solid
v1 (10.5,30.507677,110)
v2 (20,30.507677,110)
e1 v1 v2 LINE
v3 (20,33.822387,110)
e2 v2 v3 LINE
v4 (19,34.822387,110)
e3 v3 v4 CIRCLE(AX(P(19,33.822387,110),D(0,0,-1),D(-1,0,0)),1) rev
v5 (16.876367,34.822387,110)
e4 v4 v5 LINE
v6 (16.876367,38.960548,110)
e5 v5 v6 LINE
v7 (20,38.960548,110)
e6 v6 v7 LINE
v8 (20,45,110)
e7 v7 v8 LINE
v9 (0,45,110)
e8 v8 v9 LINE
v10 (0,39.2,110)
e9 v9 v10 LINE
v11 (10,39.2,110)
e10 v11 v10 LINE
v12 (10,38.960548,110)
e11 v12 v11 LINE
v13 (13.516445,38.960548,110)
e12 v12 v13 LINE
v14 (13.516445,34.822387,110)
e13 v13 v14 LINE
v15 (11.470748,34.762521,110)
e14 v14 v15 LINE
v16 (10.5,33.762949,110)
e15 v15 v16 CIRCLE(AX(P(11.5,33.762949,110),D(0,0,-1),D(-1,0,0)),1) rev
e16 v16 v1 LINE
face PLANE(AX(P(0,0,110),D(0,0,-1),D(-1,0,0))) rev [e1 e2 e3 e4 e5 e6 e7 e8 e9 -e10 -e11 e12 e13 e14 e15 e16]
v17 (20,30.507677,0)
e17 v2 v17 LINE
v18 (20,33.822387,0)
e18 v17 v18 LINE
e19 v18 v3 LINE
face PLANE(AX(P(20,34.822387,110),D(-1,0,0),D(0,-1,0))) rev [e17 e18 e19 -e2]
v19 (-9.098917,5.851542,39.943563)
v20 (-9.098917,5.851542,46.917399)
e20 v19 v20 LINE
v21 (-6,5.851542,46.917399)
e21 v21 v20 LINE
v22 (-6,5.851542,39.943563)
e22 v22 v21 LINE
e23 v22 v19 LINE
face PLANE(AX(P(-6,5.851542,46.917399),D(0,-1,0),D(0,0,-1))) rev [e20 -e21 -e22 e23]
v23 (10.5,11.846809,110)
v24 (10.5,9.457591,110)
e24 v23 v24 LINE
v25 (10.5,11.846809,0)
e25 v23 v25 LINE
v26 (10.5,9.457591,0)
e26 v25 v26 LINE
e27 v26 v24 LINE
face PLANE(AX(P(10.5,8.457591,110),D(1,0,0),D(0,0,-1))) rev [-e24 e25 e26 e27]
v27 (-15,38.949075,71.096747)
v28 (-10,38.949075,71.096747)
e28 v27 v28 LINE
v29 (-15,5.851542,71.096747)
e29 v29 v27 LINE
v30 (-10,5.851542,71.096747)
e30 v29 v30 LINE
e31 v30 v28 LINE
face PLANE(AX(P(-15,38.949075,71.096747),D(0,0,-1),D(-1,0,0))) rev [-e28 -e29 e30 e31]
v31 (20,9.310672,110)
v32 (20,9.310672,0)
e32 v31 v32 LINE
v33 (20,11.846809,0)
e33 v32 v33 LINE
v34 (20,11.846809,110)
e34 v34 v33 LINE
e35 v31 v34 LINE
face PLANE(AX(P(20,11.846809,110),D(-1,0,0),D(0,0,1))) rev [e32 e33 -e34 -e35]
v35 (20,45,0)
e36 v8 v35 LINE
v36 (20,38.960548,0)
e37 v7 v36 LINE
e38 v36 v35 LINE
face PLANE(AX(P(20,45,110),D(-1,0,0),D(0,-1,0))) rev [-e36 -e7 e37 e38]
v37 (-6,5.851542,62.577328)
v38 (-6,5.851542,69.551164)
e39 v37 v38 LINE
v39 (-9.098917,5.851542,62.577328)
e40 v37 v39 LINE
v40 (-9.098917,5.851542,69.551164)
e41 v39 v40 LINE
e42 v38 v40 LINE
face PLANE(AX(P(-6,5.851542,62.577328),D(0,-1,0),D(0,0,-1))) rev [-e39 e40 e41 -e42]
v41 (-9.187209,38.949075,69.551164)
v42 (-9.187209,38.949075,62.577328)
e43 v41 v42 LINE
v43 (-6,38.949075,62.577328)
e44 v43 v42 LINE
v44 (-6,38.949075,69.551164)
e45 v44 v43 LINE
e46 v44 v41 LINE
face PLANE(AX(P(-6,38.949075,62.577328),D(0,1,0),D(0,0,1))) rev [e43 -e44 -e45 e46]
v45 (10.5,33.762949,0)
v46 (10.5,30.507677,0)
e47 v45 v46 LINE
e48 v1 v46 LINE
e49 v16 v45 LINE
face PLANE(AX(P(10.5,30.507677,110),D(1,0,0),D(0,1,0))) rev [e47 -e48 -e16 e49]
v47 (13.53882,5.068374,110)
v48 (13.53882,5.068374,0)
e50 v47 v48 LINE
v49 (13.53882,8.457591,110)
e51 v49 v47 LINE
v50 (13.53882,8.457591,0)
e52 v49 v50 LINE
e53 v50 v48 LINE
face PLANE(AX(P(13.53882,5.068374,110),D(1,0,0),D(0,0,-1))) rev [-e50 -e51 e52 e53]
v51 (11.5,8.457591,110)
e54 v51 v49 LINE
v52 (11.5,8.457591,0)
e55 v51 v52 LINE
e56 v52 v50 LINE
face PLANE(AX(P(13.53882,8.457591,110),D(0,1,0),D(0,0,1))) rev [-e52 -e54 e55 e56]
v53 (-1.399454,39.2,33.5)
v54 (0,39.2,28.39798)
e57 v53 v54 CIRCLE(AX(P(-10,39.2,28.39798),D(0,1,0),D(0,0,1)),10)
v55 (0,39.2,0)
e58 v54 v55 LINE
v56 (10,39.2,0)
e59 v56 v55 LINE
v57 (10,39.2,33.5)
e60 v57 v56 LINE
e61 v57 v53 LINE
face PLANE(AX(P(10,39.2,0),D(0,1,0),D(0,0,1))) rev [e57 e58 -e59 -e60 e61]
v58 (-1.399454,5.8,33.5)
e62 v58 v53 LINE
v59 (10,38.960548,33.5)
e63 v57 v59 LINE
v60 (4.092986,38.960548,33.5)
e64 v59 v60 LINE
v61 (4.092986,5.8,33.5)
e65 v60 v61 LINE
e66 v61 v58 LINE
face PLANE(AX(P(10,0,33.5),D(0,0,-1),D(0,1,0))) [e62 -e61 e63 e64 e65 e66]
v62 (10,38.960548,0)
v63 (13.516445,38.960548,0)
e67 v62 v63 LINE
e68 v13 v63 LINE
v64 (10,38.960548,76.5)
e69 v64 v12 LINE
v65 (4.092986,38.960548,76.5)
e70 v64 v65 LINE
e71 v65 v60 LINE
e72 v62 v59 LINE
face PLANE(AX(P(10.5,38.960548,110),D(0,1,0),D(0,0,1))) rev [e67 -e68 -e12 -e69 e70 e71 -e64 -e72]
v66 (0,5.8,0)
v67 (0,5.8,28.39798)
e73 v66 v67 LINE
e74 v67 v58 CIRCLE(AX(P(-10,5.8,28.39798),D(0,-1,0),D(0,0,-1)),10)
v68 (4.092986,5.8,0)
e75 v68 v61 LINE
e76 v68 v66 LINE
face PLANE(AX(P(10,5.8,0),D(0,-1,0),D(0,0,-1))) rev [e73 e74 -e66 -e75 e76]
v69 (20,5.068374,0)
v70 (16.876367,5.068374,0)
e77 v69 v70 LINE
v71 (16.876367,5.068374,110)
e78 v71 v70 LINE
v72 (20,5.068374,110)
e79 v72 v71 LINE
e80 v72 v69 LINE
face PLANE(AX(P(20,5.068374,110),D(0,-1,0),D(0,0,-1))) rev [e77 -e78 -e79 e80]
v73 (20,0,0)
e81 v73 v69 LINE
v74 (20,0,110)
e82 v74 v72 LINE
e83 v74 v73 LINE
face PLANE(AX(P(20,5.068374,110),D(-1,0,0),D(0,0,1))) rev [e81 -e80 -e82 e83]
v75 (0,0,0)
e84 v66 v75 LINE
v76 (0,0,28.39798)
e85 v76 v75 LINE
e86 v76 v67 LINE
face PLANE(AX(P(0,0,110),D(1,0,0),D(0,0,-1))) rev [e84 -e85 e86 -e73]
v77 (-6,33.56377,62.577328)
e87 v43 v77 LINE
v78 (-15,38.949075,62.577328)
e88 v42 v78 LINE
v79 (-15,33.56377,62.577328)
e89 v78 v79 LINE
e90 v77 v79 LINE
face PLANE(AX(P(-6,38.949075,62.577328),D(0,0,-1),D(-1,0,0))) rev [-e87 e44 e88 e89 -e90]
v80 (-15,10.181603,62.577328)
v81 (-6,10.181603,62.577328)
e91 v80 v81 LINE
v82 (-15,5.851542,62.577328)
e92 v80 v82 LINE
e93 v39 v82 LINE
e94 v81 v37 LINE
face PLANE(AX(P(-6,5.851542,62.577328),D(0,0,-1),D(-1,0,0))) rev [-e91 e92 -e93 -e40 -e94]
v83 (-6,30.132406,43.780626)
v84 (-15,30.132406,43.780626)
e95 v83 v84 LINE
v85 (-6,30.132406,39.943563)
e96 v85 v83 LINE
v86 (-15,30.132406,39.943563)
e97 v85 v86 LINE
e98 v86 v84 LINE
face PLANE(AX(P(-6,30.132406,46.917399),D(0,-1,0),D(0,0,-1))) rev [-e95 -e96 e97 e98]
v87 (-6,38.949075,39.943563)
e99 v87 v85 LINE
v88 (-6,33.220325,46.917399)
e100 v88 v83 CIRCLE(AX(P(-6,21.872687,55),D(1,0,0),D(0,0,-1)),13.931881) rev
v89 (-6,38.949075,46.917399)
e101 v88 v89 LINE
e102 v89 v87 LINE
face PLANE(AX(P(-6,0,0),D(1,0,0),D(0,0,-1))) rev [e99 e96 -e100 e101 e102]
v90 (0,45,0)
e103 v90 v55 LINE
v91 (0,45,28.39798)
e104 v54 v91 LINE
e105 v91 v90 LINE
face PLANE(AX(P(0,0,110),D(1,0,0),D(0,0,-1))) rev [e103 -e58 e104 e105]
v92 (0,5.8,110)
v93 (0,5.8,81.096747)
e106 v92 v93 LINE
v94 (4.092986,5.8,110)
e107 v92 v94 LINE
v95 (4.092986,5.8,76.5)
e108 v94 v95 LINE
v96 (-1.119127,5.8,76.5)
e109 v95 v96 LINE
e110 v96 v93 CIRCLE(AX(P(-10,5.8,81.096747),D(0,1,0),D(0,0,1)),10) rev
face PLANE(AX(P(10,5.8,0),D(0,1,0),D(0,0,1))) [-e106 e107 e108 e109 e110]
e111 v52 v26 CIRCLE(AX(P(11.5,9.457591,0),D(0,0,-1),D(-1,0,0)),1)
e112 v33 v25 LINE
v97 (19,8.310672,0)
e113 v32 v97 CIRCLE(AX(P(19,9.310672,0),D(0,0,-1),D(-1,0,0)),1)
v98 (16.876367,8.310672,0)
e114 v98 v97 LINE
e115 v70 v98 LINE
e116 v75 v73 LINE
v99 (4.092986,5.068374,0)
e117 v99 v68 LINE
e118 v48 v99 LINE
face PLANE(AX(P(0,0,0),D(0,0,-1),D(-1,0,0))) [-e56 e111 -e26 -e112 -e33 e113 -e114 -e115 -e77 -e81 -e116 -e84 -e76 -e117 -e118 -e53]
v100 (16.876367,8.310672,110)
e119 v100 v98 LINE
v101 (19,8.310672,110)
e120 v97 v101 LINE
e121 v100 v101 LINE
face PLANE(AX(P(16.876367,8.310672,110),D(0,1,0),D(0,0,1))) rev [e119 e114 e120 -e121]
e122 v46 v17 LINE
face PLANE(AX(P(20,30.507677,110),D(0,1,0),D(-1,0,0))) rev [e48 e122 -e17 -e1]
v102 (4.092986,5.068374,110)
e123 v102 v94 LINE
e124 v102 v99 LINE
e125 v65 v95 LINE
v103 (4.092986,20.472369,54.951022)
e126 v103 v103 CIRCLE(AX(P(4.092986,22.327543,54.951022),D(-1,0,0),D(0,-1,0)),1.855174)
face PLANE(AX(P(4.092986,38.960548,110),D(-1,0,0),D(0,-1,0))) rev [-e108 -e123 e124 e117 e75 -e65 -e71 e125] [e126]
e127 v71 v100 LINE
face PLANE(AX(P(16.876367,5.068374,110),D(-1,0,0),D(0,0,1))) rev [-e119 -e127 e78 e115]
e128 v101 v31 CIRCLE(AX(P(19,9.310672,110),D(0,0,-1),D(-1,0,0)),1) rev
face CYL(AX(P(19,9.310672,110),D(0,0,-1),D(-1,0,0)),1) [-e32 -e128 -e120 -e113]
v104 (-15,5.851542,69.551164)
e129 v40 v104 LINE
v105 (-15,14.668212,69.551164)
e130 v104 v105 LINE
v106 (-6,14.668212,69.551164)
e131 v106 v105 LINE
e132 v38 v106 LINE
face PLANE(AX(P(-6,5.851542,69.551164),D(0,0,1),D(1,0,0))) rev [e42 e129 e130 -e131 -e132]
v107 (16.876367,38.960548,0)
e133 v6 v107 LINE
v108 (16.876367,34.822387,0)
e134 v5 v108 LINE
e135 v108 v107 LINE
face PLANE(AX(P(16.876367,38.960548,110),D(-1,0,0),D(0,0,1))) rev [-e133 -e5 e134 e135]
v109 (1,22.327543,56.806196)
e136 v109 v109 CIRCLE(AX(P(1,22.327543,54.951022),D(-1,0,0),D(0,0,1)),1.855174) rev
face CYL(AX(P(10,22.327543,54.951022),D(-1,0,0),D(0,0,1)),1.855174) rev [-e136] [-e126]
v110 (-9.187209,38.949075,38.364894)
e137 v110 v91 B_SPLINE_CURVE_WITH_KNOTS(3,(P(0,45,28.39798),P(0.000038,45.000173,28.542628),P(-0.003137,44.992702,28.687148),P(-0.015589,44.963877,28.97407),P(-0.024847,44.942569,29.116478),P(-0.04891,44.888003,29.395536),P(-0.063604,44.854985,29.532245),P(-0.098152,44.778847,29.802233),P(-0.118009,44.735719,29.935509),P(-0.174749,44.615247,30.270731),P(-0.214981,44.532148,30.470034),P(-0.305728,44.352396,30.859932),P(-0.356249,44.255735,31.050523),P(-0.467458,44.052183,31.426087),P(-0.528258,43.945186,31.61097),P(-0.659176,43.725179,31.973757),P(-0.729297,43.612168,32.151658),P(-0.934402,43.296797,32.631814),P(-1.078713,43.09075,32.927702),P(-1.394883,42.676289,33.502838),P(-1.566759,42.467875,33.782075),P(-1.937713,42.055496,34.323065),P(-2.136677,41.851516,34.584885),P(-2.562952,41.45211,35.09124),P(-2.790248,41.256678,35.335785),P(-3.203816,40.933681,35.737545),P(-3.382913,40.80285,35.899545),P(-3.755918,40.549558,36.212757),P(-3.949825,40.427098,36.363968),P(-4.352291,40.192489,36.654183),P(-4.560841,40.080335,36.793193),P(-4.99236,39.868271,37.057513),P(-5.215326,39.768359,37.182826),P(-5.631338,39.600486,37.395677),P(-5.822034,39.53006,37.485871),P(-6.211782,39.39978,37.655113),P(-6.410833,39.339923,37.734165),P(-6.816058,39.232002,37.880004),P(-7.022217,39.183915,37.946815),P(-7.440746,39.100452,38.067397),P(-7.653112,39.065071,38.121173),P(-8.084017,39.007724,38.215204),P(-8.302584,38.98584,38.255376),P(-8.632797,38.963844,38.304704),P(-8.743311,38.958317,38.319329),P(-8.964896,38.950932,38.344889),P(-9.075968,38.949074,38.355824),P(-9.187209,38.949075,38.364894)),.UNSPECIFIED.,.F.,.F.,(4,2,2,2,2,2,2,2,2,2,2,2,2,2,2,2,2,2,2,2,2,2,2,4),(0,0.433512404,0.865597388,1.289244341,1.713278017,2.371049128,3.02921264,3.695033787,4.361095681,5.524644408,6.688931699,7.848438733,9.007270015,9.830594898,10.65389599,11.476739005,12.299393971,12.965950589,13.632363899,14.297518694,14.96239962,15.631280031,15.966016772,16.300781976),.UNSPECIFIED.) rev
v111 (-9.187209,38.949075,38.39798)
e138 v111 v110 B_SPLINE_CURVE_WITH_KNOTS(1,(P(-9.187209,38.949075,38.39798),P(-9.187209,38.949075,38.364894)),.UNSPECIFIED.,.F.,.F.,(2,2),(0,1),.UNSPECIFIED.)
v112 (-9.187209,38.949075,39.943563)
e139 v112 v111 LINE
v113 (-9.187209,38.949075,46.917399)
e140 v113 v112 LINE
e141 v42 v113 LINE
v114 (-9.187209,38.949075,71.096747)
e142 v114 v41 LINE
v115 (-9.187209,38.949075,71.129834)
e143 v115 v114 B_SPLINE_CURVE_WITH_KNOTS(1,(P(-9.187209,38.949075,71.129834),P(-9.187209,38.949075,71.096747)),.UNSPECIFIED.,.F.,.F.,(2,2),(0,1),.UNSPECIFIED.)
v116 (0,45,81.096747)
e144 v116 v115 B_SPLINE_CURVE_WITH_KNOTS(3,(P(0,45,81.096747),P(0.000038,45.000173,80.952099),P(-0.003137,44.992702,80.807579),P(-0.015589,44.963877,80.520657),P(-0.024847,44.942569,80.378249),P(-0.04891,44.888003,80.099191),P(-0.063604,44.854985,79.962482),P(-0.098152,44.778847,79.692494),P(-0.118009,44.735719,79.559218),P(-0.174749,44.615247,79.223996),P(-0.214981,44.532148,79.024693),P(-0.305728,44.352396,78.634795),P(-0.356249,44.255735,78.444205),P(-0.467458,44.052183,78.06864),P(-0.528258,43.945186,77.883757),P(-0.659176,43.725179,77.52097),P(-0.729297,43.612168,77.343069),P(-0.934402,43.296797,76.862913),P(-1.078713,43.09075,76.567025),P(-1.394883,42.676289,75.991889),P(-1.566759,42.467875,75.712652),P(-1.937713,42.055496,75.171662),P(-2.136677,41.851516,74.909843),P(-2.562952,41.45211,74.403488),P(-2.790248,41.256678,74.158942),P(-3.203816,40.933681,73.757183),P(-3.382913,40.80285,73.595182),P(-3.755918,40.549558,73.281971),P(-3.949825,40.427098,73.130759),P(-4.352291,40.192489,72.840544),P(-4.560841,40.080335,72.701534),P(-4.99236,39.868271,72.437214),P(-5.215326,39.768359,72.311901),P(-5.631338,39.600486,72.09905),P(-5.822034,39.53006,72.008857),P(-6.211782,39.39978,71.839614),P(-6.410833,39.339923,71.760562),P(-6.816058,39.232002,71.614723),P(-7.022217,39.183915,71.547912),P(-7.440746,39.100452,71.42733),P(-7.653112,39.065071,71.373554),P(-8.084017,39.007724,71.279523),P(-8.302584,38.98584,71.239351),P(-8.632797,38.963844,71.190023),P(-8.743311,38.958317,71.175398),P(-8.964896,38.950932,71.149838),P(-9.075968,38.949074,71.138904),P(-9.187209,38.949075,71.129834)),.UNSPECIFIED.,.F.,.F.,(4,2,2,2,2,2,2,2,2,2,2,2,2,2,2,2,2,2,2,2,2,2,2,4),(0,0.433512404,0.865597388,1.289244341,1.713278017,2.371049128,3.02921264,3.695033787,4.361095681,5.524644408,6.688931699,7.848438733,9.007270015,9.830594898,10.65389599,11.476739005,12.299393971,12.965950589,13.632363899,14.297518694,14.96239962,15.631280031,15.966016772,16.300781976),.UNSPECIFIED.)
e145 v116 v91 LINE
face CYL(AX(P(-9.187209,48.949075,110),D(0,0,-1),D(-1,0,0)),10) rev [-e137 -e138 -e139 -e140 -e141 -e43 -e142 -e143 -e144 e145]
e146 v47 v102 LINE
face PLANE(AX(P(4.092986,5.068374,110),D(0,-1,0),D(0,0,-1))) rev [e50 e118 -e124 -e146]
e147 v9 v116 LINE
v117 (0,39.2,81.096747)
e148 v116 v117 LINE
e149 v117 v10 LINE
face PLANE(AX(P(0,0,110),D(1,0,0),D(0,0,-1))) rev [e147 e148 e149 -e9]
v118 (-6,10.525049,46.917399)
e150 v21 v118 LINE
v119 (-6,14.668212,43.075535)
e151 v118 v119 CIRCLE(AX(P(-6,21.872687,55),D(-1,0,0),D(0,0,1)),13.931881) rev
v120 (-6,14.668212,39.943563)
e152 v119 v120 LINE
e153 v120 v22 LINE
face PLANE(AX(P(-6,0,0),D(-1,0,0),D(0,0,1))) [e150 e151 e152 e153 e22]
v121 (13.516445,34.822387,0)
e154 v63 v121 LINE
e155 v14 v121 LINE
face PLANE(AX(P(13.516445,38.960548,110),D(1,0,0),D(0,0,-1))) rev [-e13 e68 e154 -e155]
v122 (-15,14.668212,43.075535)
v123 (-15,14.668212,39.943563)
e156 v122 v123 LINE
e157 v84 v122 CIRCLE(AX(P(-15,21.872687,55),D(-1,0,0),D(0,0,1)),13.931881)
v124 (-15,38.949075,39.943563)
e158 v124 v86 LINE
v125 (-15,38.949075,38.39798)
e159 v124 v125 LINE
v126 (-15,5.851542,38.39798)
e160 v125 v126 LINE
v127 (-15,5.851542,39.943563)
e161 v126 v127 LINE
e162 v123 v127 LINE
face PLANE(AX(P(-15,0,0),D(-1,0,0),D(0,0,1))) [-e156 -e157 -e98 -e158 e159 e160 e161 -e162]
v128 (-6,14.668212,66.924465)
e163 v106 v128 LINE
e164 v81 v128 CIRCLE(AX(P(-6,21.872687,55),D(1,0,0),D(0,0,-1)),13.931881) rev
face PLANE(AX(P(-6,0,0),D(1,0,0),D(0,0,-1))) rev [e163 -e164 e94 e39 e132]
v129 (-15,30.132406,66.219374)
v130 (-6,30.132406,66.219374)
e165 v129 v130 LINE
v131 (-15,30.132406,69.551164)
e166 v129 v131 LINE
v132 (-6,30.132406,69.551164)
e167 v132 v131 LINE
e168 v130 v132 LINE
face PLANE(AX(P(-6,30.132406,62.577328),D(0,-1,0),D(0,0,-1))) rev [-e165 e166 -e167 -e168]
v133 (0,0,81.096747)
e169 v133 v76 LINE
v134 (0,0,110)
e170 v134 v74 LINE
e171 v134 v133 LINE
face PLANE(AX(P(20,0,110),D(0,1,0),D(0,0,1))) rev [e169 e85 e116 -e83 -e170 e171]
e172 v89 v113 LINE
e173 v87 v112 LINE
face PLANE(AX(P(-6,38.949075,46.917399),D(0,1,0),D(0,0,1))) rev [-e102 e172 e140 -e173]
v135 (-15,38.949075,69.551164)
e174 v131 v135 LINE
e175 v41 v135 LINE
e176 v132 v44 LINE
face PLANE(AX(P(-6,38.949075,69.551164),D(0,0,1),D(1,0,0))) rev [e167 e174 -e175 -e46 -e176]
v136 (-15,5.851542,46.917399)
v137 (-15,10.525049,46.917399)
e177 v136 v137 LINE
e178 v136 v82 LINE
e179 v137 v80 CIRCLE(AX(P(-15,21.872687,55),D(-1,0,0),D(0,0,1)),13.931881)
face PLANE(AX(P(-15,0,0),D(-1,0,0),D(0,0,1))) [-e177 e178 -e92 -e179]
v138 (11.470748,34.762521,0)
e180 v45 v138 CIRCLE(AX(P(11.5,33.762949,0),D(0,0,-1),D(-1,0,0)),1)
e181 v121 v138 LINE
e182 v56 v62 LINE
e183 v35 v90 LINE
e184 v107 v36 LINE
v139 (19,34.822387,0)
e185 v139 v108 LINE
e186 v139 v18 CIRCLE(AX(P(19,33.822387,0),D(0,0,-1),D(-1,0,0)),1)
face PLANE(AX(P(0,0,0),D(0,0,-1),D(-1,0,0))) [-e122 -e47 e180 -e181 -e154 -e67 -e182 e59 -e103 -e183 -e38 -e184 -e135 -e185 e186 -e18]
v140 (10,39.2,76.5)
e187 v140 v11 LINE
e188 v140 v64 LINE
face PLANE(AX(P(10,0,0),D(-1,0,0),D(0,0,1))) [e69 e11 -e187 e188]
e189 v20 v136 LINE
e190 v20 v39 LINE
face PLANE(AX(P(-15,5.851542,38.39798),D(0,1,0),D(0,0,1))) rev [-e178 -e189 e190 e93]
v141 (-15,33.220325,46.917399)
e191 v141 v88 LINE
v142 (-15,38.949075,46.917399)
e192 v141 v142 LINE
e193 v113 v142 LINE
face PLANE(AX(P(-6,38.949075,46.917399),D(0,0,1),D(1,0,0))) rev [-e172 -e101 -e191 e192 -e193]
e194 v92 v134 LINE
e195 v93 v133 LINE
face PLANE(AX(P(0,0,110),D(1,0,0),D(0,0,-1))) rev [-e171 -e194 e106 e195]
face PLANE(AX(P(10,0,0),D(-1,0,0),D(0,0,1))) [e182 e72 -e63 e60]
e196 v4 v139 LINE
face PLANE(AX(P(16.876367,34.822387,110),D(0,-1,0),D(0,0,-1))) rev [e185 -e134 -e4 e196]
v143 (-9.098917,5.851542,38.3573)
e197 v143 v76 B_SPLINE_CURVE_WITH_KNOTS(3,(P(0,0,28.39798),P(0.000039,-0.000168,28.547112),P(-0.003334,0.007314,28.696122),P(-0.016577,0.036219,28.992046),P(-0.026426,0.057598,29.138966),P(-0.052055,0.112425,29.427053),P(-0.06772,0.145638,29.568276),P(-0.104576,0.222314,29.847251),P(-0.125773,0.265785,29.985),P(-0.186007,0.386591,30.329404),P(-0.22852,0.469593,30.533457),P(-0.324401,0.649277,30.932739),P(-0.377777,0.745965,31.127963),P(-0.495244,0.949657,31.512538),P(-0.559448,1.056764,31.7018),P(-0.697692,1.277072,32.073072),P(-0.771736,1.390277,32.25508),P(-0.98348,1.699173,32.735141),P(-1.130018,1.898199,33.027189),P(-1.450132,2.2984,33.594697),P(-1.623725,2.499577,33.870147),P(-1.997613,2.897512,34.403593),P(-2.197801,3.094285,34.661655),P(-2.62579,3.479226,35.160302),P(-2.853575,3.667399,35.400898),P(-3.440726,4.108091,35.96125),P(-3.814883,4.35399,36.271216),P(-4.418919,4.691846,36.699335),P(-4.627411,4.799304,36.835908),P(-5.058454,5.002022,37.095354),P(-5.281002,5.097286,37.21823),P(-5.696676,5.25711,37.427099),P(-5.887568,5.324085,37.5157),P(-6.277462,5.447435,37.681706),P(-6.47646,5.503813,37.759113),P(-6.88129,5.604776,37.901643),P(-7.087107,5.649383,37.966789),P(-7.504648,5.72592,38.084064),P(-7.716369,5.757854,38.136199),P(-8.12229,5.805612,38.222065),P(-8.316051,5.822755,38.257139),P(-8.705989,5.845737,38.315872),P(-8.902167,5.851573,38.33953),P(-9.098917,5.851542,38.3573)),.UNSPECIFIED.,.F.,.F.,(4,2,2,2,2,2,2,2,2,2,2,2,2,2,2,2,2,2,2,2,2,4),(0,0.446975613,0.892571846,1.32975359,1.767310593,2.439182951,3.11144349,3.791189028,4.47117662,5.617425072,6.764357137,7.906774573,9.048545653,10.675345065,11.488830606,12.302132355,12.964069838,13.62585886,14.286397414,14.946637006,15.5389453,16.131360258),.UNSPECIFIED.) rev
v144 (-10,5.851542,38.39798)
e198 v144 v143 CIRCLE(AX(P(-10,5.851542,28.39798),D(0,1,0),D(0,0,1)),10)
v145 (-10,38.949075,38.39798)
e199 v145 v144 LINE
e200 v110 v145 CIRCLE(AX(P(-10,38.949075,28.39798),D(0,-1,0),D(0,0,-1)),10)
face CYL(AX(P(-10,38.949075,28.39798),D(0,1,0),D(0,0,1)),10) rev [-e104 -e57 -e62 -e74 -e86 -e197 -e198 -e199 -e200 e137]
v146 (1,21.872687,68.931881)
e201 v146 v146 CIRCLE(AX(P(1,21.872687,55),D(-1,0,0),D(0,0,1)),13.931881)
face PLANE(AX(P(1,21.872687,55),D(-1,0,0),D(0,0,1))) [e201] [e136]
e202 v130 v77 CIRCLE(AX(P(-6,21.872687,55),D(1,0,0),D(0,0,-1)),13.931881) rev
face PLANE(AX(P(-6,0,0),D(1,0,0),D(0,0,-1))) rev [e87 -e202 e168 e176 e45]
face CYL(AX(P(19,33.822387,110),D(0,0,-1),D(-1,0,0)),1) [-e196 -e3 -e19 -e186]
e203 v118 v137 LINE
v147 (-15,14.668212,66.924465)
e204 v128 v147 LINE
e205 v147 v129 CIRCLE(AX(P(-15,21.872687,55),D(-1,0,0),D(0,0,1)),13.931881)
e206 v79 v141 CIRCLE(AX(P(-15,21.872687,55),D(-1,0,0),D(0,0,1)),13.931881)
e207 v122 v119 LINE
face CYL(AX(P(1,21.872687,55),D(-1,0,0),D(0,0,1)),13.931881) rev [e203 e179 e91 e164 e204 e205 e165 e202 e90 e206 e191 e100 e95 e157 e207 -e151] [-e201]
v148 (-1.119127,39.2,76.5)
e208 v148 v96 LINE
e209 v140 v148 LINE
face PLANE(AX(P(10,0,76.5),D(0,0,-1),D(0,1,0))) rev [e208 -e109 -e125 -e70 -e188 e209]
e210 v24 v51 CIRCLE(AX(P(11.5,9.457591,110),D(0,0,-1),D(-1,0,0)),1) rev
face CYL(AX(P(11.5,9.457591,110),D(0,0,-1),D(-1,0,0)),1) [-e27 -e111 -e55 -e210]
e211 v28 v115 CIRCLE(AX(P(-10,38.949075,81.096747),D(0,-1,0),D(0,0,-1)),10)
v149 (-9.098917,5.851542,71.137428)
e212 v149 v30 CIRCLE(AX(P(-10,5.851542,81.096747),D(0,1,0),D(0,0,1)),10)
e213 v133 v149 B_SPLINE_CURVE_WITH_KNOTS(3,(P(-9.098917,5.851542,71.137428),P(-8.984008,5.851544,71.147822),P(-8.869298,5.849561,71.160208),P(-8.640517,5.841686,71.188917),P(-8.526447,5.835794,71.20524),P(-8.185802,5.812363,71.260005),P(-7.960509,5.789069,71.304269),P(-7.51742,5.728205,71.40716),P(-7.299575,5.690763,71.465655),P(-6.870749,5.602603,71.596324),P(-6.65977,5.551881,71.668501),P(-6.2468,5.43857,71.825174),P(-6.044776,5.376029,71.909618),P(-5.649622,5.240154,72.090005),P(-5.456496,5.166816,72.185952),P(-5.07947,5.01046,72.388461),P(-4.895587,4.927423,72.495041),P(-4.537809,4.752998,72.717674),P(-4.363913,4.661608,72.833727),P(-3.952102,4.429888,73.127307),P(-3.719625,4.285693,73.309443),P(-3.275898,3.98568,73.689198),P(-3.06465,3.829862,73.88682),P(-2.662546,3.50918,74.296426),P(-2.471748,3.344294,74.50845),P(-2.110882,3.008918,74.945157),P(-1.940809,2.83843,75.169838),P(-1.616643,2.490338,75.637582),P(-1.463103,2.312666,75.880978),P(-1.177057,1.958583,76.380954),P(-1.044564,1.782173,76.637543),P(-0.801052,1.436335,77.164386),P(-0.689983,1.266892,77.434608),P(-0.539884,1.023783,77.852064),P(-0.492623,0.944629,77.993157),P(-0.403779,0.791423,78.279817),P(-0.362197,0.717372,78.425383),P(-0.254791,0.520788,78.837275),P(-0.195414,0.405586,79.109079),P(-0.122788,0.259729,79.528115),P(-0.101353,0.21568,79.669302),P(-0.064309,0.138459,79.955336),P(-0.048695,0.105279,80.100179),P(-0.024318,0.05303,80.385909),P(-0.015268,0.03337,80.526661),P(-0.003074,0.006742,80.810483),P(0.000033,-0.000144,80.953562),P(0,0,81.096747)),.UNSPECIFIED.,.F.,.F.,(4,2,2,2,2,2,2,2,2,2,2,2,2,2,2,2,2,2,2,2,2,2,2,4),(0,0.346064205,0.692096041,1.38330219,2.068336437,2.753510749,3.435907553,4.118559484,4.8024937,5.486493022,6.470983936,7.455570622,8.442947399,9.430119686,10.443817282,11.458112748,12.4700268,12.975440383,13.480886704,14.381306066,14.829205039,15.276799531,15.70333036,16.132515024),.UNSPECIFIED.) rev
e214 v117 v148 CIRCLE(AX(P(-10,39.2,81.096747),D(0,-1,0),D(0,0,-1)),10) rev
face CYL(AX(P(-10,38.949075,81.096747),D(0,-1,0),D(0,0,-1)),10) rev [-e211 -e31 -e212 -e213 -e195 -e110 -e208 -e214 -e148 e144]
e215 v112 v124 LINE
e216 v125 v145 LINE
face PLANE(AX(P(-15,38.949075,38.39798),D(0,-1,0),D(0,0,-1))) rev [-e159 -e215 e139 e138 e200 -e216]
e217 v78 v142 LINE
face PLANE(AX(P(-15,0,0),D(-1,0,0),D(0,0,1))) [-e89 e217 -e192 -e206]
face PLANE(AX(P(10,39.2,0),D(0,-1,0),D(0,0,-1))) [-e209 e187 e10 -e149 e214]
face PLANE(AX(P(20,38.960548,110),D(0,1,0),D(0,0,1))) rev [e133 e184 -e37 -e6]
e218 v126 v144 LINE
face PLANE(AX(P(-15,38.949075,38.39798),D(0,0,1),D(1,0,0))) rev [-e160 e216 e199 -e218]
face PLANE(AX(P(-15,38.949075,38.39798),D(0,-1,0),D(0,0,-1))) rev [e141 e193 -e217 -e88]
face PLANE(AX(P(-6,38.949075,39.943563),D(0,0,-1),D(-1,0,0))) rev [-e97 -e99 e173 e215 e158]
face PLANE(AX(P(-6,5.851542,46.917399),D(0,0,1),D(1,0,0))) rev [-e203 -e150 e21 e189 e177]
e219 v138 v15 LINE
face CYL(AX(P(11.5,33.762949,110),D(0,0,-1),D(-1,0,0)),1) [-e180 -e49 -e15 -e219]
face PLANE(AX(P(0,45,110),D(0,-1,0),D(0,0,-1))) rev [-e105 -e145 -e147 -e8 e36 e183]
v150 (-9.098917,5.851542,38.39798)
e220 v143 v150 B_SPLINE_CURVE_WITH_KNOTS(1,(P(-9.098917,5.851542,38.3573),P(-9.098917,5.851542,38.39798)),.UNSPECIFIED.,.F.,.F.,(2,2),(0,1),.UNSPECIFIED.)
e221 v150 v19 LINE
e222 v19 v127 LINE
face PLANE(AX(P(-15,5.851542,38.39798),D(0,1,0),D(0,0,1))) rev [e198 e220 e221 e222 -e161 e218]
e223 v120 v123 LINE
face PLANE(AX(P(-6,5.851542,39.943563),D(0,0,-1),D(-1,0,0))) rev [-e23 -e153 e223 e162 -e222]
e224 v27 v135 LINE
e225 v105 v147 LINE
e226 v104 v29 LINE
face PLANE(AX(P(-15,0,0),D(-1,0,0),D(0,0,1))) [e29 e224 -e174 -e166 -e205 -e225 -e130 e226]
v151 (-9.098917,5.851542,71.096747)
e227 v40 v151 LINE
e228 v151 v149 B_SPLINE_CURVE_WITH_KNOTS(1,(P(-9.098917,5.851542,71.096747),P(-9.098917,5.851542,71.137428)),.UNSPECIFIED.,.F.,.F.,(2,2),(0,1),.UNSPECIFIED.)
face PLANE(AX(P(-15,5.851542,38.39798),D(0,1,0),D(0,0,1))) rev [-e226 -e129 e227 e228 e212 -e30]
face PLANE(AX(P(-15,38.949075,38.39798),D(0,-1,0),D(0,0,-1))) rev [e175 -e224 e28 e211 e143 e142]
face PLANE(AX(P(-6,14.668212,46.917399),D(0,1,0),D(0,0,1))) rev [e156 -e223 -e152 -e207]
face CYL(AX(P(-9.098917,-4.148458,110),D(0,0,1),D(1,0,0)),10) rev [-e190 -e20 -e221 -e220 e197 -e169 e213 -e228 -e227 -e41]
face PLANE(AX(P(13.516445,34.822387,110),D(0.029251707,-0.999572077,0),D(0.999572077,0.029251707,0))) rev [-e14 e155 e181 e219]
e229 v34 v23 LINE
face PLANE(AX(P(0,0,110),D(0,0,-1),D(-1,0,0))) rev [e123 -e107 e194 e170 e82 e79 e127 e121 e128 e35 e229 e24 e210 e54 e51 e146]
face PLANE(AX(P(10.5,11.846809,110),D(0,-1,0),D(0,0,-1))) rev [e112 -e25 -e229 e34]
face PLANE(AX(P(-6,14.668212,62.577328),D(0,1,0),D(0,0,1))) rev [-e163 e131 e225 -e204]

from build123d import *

# Parameters (mm, degrees)
BOSS_EXTRUDE1_DEPTH = 110
SKETCH2_W           = 33.5
SKETCH2_H           = 33.4
CUT_EXTRUDE1_DEPTH  = 10
SKETCH3_R           = 1.855174256
CUT_EXTRUDE3_DEPTH  = 10
SKETCH5_W           = 32.698767502
SKETCH5_H           = 33.097532959
BOSS_EXTRUDE2_DEPTH = 15
FILLET1_START       = 28.397979731
FILLET1_DEPTH       = 52.698767702
FILLET1_START_2     = -6.3183e-05
FILLET1_2_DEPTH     = 45.00011208
FILLET1_START_3     = 5.8
FILLET1_3_DEPTH     = 33.4
FILLET1_START_4     = 5.851542156
FILLET1_4_DEPTH     = 33.097532959
SKETCH6_R           = 13.931881445
CUT_EXTRUDE5_DEPTH  = 16
FILLET7_R           = 1
FILLET8_R           = 1
SKETCH8_W           = 6.973836054
SKETCH8_H           = 8.816669347
CUT_EXTRUDE6_DEPTH  = 9


with BuildPart() as part:
    # Sketch1 → Boss-Extrude1 (new body)
    with BuildSketch(Plane.XY):
        Polygon((0, 0), (0, 45), (20, 45), (20, 38.960548223), (16.876367343, 38.960548223), (16.876367343, 34.822386524), (20, 34.822386524), (20, 30.507676941), (10.5, 30.507676941), (10.5, 34.734112582), (13.516445061, 34.822386524), (13.516445061, 38.960548223), (10.5, 38.960548223), (4.092986166, 38.960548223), (4.092986166, 5.068373594), (10.5, 5.068373594), (13.538820233, 5.068373594), (13.538820233, 8.457591057), (10.5, 8.457591057), (10.5, 11.84680852), (20, 11.84680852), (20, 8.310671744), (16.876367343, 8.310671744), (16.876367343, 5.068373594), (20, 5.068373594), (20, 0), align=None)
    extrude(amount=BOSS_EXTRUDE1_DEPTH)

    # Sketch2 → Cut-Extrude1 (cut)
    with BuildSketch(Plane.ZY):
        with Locations((93.25, 22.5)):
            Rectangle(SKETCH2_W, SKETCH2_H)
        with Locations((16.75, 22.5)):
            Rectangle(SKETCH2_W, SKETCH2_H)
    extrude(amount=-CUT_EXTRUDE1_DEPTH, mode=Mode.SUBTRACT)

    # Sketch3 → Cut-Extrude3 (cut)
    with BuildSketch(Plane.ZY):
        with Locations((54.95102213, 22.327543377)):
            Circle(SKETCH3_R)
    extrude(amount=-CUT_EXTRUDE3_DEPTH, mode=Mode.SUBTRACT)

    # Sketch5 → Boss-Extrude2 (add)
    with BuildSketch(Plane.ZY):
        with Locations((54.747363582, 22.400308636)):
            Rectangle(SKETCH5_W, SKETCH5_H)
    extrude(amount=BOSS_EXTRUDE2_DEPTH)

    # Fillet1: read off the stored shape, not the designer's step
    # Fillet1 outline → Fillet1 (add)
    with BuildSketch(Plane.XY.offset(FILLET1_START)):
        with BuildLine():
            Line((0, 39.2), (2.35e-05, 45.000054671))
            ThreePointArc((2.35e-05, 45.000054671), (-3.686763576, 40.597721798), (-9.187208811, 38.949075115))
            Line((-9.187208811, 38.949075115), (0, 38.949075115))
            Line((0, 38.949075115), (0, 39.2))
        make_face()
        with BuildLine():
            Line((2.8807e-05, -6.3183e-05), (0, 5.851542156))
            Line((0, 5.851542156), (-9.098917382, 5.851542156))
            ThreePointArc((-9.098917382, 5.851542156), (-3.689848451, 4.262366926), (2.8807e-05, -6.3183e-05))
        make_face()
    extrude(amount=FILLET1_DEPTH)

    # Fillet1 2 outline → Fillet1 2 (cut)
    with BuildSketch(Plane(origin=(0, 0, 0), x_dir=(1, 0, 0), z_dir=(0, 1, 0)).offset(FILLET1_START_2)):
        with BuildLine():
            Line((-12, -28.397979731), (-12, -38.397979831))
            Line((-12, -38.397979831), (-10, -38.397979831))
            ThreePointArc((-10, -38.397979831), (-2.928932158, -35.469047613), (0, -28.397979745))
            Line((0, -28.397979745), (-12, -28.397979731))
        make_face()
        with BuildLine():
            Line((-10, -71.096747333), (-12, -71.096747333))
            Line((-12, -71.096747333), (-12, -81.096747433))
            Line((-12, -81.096747433), (0, -81.096747419))
            ThreePointArc((0, -81.096747419), (-2.928932158, -74.025679551), (-10, -71.096747333))
        make_face()
    extrude(amount=FILLET1_2_DEPTH, mode=Mode.SUBTRACT)

    # Fillet1 3 outline → Fillet1 3 (cut)
    with BuildSketch(Plane(origin=(0, 0, 0), x_dir=(1, 0, 0), z_dir=(0, 1, 0)).offset(FILLET1_START_3)):
        with BuildLine():
            Line((-1.399454076, -33.5), (0, -33.5))
            Line((0, -33.5), (0, -28.397979831))
            ThreePointArc((0, -28.397979831), (-0.356207716, -31.043215242), (-1.399454076, -33.5))
        make_face()
        with BuildLine():
            Line((0, -81.096747333), (0, -76.5))
            Line((0, -76.5), (-1.119126509, -76.5))
            ThreePointArc((-1.119126509, -76.5), (-0.283809005, -78.731238393), (0, -81.096747333))
        make_face()
    extrude(amount=FILLET1_3_DEPTH, mode=Mode.SUBTRACT)

    # Fillet1 4 outline → Fillet1 4 (add)
    with BuildSketch(Plane(origin=(0, 0, 0), x_dir=(1, 0, 0), z_dir=(0, 1, 0)).offset(FILLET1_START_4)):
        with BuildLine():
            Line((0, -38.397979831), (0, -33.5))
            Line((0, -33.5), (-1.399454076, -33.5))
            ThreePointArc((-1.399454076, -33.5), (-5.051272976, -37.087634649), (-10, -38.397979831))
            Line((-10, -38.397979831), (0, -38.397979831))
        make_face()
        with BuildLine():
            Line((-1.119126509, -76.5), (0, -76.5))
            Line((0, -76.5), (0, -71.096747333))
            Line((0, -71.096747333), (-10, -71.096747333))
            ThreePointArc((-10, -71.096747333), (-4.802282873, -72.55369538), (-1.119126509, -76.5))
        make_face()
    extrude(amount=FILLET1_4_DEPTH)

    # Sketch6 → Cut-Extrude5 (cut)
    with BuildSketch(Plane.ZY.offset(15)):
        with Locations((55, 21.872686564)):
            Circle(SKETCH6_R)
    extrude(amount=-CUT_EXTRUDE5_DEPTH, mode=Mode.SUBTRACT)

    # Fillet7
    fillet7_edges = [part.edges().sort_by_distance(p)[0] for p in [
        (20, 34.822386524, 55),
        (10.5, 34.734112582, 55),
    ]]
    fillet(fillet7_edges, radius=FILLET7_R)

    # Fillet8
    fillet8_edges = [part.edges().sort_by_distance(p)[0] for p in [
        (10.5, 8.457591057, 55),
        (20, 8.310671744, 55),
    ]]
    fillet(fillet8_edges, radius=FILLET8_R)

    # Sketch8 → Cut-Extrude6 (cut)
    with BuildSketch(Plane.ZY.offset(15)):
        with Locations((66.064245808, 34.540740441)):
            Rectangle(SKETCH8_W, SKETCH8_H)
        with Locations((43.430481356, 34.540740441)):
            Rectangle(SKETCH8_W, SKETCH8_H)
        with Locations((66.064245808, 10.25987683)):
            Rectangle(SKETCH8_W, SKETCH8_H)
        with Locations((43.430481356, 10.25987683)):
            Rectangle(SKETCH8_W, SKETCH8_H)
    extrude(amount=-CUT_EXTRUDE6_DEPTH, mode=Mode.SUBTRACT)


solid = part.part
